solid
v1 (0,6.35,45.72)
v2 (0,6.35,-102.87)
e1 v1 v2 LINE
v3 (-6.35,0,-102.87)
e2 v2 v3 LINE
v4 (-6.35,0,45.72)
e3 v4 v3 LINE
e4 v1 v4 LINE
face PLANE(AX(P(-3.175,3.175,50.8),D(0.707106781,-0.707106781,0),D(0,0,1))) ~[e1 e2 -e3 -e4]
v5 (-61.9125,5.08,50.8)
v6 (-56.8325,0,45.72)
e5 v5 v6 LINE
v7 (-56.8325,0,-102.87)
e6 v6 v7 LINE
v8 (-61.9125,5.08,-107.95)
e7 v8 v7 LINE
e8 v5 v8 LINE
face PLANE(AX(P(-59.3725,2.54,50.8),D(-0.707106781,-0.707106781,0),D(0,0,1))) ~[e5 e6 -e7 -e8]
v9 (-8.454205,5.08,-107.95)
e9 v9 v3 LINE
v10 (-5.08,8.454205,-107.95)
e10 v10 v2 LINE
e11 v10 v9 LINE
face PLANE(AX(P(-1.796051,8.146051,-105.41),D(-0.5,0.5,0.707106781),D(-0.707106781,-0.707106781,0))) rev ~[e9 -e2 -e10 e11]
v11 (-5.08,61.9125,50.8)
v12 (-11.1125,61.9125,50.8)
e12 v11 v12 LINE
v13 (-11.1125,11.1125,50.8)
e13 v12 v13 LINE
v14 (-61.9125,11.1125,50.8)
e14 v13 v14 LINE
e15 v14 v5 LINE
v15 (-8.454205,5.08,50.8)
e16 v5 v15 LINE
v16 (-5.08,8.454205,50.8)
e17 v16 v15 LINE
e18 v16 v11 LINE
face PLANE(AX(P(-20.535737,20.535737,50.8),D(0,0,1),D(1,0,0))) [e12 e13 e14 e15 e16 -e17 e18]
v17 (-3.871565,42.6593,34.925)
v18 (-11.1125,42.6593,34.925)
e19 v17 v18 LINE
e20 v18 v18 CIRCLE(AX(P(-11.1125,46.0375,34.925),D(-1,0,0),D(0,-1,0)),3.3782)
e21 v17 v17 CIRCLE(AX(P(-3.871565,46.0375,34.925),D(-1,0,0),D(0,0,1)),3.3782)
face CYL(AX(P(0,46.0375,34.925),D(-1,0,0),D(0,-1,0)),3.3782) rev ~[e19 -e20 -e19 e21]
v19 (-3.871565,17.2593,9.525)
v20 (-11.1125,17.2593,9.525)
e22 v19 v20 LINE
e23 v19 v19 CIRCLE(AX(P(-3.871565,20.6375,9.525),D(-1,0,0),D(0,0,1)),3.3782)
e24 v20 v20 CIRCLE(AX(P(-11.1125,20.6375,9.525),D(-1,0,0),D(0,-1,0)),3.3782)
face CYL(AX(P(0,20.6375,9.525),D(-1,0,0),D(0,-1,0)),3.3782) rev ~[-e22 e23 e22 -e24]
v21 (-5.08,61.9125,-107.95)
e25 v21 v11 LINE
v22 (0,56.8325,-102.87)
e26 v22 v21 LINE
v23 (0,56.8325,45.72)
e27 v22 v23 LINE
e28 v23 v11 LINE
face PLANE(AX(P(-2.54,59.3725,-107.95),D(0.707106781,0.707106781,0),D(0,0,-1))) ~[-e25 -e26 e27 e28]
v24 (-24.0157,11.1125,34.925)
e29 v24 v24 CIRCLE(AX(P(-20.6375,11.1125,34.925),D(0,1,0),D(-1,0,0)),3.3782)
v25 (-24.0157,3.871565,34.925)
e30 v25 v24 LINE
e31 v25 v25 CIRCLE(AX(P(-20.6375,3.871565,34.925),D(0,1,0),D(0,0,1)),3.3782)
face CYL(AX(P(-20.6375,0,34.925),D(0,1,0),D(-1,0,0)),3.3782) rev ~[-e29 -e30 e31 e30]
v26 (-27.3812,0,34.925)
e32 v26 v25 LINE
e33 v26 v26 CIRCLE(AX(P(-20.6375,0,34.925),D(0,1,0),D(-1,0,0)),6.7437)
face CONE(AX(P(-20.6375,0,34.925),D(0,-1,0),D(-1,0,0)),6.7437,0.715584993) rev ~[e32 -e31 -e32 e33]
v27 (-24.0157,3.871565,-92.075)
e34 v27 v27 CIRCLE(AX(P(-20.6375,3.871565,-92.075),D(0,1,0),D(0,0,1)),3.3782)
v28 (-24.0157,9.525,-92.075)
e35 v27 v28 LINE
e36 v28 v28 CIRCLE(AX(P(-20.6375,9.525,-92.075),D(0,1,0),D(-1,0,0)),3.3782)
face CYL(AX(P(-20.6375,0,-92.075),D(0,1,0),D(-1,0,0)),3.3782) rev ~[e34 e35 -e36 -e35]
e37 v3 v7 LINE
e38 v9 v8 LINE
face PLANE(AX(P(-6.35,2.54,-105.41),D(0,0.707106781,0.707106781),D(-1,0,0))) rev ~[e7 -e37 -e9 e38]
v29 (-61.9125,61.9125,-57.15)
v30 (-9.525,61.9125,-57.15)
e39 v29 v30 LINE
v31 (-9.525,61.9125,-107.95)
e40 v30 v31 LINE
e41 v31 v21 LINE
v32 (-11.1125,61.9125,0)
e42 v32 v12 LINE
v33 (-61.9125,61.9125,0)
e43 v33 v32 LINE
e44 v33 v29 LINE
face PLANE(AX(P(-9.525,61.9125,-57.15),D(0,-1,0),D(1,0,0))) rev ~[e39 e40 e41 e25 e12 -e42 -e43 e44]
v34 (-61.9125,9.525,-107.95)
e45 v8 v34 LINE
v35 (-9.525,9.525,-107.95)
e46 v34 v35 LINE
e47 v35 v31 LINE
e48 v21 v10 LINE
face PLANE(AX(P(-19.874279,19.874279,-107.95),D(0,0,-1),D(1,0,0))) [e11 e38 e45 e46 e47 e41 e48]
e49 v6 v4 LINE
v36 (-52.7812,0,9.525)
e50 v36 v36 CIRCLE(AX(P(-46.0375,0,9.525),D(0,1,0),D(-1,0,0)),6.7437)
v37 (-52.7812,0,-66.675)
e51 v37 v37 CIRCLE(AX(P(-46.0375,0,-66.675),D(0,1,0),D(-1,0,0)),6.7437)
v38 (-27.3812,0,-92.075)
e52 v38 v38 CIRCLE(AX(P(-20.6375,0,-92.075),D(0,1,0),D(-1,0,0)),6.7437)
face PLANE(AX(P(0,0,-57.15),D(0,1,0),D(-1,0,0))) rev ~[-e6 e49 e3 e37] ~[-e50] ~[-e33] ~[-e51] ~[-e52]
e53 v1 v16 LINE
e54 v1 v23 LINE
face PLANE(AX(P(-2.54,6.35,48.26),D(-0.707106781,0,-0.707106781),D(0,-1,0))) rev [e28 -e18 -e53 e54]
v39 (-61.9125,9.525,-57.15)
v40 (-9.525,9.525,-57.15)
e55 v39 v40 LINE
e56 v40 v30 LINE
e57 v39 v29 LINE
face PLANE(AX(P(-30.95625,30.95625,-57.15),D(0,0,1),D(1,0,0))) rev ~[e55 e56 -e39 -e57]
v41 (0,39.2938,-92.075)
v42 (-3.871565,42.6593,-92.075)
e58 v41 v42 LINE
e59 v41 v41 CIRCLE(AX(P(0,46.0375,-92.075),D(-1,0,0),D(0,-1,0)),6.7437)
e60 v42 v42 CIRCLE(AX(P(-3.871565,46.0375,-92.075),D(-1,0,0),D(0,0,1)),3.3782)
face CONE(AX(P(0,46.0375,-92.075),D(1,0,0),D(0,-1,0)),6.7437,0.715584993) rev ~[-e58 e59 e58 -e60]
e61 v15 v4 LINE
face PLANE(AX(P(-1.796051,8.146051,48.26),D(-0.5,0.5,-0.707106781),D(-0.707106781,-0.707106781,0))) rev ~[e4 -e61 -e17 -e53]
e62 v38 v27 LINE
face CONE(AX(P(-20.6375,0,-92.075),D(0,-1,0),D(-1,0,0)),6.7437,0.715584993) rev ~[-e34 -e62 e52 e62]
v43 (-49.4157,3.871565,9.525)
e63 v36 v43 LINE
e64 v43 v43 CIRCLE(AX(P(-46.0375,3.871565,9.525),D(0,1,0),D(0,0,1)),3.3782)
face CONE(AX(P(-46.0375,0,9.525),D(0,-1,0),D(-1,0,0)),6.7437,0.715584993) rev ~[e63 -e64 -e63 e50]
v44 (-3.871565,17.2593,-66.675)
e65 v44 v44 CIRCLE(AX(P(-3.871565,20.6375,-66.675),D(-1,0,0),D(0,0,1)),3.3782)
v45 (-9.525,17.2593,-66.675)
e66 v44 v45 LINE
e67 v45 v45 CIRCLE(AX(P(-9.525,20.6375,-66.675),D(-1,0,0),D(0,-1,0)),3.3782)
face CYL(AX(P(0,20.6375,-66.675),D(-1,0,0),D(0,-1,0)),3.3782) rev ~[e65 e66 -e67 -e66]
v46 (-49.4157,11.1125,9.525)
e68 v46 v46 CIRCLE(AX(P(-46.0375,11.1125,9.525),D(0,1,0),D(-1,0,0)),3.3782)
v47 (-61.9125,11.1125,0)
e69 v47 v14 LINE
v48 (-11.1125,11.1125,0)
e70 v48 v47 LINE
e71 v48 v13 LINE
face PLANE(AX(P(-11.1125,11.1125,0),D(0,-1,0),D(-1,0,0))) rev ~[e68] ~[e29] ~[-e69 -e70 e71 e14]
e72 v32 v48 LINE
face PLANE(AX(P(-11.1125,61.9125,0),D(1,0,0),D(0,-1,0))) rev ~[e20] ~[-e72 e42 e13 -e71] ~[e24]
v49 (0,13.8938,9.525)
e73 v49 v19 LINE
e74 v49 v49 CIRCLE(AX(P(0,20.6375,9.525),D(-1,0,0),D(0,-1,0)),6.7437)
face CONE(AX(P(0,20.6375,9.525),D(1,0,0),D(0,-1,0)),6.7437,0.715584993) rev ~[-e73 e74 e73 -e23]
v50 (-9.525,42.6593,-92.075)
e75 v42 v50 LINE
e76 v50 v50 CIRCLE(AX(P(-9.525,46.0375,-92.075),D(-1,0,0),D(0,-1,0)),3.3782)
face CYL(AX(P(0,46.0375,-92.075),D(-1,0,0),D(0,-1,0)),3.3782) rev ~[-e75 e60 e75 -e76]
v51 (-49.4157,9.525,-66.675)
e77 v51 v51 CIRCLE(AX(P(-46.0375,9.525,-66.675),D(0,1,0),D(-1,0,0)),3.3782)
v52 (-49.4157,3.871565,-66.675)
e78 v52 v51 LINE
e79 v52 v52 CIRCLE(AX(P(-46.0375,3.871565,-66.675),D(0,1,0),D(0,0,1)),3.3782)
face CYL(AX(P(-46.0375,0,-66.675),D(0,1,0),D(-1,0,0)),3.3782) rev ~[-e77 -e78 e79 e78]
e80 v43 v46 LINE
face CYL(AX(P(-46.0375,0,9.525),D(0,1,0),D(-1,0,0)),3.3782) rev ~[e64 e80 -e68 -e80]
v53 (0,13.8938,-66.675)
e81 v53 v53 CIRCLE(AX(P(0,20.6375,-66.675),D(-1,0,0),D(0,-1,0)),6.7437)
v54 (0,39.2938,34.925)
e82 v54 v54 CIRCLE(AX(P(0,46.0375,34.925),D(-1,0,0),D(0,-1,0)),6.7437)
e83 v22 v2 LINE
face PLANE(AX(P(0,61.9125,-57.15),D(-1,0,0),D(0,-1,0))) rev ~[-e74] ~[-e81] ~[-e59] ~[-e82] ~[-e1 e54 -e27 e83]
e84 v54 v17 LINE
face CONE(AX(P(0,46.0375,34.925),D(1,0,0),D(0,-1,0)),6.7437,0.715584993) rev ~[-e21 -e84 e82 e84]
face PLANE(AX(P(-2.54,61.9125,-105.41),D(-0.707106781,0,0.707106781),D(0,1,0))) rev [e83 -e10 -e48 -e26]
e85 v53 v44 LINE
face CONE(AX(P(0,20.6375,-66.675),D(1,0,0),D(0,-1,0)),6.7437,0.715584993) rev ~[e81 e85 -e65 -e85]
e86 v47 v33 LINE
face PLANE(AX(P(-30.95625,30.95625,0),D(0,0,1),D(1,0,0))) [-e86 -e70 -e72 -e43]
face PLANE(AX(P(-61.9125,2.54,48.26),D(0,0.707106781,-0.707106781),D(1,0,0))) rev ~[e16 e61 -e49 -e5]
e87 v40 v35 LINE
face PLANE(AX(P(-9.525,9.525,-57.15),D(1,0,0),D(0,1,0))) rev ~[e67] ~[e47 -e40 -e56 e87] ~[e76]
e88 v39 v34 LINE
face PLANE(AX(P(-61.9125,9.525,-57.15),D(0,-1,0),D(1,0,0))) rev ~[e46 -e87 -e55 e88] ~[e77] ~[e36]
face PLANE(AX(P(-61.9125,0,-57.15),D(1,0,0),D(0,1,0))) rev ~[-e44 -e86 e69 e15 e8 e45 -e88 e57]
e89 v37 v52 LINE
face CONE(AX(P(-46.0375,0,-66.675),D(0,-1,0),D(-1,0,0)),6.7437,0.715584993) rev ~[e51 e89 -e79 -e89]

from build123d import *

# Parameters (mm, degrees)
F1_DEPTH             = 50.8
F2_W                 = 61.9125
F2_H                 = 61.9125
F3_DEPTH             = 57.15
F5_DEPTH             = 50.8
F8_D                 = 6.7564
F8_CSINK_D           = 13.4874
F8_CSINK_ANGLE       = 82
F8_ON_F7_D           = 6.7564
F8_ON_F7_CSINK_D     = 13.4874
F8_ON_F7_CSINK_ANGLE = 82
F9_SIZE              = 6.35
F11_SIZE             = 5.08


# Not quite as in the source:
# - a feature of the source that left no trace in its solid (it failed there, or was rolled back) is left out
# - a feature names something its author has since deleted; it is built from what else it names


with BuildPart() as f1:
    # F0 (on Top) → F1 (new body)
    with BuildSketch(Plane.XY):
        Polygon((-61.9125, 0), (0, 0), (0, 61.9125), (-11.1125, 61.9125), (-11.1125, 11.1125), (-61.9125, 11.1125), align=None)
    extrude(amount=F1_DEPTH)

    # F2 (on Top) → F3 (join)
    with BuildSketch(Plane.XY):
        with Locations((-30.95625, 30.95625)):
            Rectangle(F2_W, F2_H)
    extrude(amount=-F3_DEPTH)

    # F4 (on face) → F5 (join)
    with BuildSketch(Plane(origin=(0, 0, -57.15), x_dir=(1, 0, 0), z_dir=(0, 0, -1))):
        Polygon((0, -61.9125), (0, 0), (-61.9125, 0), (-61.9125, -9.525), (-9.525, -9.525), (-9.525, -61.9125), align=None)
    extrude(amount=F5_DEPTH)

    # F8 (through all)
    with Locations(Plane.YZ):
        with Locations((46.0375, 34.925), (20.6375, 9.525), (20.6375, -66.675), (46.0375, -92.075)):
            CounterSinkHole(F8_D / 2, F8_CSINK_D / 2, counter_sink_angle=F8_CSINK_ANGLE)

    # F8 on F7 (through all)
    with Locations(Plane.XZ):
        with Locations((-20.6375, 34.925), (-46.0375, 9.525), (-46.0375, -66.675), (-20.6375, -92.075)):
            CounterSinkHole(F8_ON_F7_D / 2, F8_ON_F7_CSINK_D / 2, counter_sink_angle=F8_ON_F7_CSINK_ANGLE)

    # F9
    f9_edges = [f1.edges().sort_by_distance(p)[0] for p in [
        (0, 0, -28.575),
    ]]
    chamfer(f9_edges, length=F9_SIZE)

    # F11
    f11_edges = [f1.edges().sort_by_distance(p)[0] for p in [
        (-34.13125, 0, 50.8),
        (-3.175, 3.175, 50.8),
        (0, 34.13125, 50.8),
        (-3.175, 3.175, -107.95),
        (-34.13125, 0, -107.95),
        (0, 34.13125, -107.95),
        (-61.9125, 0, -28.575),
        (0, 61.9125, -28.575),
    ]]
    chamfer(f11_edges, length=F11_SIZE)


solid = f1.part
